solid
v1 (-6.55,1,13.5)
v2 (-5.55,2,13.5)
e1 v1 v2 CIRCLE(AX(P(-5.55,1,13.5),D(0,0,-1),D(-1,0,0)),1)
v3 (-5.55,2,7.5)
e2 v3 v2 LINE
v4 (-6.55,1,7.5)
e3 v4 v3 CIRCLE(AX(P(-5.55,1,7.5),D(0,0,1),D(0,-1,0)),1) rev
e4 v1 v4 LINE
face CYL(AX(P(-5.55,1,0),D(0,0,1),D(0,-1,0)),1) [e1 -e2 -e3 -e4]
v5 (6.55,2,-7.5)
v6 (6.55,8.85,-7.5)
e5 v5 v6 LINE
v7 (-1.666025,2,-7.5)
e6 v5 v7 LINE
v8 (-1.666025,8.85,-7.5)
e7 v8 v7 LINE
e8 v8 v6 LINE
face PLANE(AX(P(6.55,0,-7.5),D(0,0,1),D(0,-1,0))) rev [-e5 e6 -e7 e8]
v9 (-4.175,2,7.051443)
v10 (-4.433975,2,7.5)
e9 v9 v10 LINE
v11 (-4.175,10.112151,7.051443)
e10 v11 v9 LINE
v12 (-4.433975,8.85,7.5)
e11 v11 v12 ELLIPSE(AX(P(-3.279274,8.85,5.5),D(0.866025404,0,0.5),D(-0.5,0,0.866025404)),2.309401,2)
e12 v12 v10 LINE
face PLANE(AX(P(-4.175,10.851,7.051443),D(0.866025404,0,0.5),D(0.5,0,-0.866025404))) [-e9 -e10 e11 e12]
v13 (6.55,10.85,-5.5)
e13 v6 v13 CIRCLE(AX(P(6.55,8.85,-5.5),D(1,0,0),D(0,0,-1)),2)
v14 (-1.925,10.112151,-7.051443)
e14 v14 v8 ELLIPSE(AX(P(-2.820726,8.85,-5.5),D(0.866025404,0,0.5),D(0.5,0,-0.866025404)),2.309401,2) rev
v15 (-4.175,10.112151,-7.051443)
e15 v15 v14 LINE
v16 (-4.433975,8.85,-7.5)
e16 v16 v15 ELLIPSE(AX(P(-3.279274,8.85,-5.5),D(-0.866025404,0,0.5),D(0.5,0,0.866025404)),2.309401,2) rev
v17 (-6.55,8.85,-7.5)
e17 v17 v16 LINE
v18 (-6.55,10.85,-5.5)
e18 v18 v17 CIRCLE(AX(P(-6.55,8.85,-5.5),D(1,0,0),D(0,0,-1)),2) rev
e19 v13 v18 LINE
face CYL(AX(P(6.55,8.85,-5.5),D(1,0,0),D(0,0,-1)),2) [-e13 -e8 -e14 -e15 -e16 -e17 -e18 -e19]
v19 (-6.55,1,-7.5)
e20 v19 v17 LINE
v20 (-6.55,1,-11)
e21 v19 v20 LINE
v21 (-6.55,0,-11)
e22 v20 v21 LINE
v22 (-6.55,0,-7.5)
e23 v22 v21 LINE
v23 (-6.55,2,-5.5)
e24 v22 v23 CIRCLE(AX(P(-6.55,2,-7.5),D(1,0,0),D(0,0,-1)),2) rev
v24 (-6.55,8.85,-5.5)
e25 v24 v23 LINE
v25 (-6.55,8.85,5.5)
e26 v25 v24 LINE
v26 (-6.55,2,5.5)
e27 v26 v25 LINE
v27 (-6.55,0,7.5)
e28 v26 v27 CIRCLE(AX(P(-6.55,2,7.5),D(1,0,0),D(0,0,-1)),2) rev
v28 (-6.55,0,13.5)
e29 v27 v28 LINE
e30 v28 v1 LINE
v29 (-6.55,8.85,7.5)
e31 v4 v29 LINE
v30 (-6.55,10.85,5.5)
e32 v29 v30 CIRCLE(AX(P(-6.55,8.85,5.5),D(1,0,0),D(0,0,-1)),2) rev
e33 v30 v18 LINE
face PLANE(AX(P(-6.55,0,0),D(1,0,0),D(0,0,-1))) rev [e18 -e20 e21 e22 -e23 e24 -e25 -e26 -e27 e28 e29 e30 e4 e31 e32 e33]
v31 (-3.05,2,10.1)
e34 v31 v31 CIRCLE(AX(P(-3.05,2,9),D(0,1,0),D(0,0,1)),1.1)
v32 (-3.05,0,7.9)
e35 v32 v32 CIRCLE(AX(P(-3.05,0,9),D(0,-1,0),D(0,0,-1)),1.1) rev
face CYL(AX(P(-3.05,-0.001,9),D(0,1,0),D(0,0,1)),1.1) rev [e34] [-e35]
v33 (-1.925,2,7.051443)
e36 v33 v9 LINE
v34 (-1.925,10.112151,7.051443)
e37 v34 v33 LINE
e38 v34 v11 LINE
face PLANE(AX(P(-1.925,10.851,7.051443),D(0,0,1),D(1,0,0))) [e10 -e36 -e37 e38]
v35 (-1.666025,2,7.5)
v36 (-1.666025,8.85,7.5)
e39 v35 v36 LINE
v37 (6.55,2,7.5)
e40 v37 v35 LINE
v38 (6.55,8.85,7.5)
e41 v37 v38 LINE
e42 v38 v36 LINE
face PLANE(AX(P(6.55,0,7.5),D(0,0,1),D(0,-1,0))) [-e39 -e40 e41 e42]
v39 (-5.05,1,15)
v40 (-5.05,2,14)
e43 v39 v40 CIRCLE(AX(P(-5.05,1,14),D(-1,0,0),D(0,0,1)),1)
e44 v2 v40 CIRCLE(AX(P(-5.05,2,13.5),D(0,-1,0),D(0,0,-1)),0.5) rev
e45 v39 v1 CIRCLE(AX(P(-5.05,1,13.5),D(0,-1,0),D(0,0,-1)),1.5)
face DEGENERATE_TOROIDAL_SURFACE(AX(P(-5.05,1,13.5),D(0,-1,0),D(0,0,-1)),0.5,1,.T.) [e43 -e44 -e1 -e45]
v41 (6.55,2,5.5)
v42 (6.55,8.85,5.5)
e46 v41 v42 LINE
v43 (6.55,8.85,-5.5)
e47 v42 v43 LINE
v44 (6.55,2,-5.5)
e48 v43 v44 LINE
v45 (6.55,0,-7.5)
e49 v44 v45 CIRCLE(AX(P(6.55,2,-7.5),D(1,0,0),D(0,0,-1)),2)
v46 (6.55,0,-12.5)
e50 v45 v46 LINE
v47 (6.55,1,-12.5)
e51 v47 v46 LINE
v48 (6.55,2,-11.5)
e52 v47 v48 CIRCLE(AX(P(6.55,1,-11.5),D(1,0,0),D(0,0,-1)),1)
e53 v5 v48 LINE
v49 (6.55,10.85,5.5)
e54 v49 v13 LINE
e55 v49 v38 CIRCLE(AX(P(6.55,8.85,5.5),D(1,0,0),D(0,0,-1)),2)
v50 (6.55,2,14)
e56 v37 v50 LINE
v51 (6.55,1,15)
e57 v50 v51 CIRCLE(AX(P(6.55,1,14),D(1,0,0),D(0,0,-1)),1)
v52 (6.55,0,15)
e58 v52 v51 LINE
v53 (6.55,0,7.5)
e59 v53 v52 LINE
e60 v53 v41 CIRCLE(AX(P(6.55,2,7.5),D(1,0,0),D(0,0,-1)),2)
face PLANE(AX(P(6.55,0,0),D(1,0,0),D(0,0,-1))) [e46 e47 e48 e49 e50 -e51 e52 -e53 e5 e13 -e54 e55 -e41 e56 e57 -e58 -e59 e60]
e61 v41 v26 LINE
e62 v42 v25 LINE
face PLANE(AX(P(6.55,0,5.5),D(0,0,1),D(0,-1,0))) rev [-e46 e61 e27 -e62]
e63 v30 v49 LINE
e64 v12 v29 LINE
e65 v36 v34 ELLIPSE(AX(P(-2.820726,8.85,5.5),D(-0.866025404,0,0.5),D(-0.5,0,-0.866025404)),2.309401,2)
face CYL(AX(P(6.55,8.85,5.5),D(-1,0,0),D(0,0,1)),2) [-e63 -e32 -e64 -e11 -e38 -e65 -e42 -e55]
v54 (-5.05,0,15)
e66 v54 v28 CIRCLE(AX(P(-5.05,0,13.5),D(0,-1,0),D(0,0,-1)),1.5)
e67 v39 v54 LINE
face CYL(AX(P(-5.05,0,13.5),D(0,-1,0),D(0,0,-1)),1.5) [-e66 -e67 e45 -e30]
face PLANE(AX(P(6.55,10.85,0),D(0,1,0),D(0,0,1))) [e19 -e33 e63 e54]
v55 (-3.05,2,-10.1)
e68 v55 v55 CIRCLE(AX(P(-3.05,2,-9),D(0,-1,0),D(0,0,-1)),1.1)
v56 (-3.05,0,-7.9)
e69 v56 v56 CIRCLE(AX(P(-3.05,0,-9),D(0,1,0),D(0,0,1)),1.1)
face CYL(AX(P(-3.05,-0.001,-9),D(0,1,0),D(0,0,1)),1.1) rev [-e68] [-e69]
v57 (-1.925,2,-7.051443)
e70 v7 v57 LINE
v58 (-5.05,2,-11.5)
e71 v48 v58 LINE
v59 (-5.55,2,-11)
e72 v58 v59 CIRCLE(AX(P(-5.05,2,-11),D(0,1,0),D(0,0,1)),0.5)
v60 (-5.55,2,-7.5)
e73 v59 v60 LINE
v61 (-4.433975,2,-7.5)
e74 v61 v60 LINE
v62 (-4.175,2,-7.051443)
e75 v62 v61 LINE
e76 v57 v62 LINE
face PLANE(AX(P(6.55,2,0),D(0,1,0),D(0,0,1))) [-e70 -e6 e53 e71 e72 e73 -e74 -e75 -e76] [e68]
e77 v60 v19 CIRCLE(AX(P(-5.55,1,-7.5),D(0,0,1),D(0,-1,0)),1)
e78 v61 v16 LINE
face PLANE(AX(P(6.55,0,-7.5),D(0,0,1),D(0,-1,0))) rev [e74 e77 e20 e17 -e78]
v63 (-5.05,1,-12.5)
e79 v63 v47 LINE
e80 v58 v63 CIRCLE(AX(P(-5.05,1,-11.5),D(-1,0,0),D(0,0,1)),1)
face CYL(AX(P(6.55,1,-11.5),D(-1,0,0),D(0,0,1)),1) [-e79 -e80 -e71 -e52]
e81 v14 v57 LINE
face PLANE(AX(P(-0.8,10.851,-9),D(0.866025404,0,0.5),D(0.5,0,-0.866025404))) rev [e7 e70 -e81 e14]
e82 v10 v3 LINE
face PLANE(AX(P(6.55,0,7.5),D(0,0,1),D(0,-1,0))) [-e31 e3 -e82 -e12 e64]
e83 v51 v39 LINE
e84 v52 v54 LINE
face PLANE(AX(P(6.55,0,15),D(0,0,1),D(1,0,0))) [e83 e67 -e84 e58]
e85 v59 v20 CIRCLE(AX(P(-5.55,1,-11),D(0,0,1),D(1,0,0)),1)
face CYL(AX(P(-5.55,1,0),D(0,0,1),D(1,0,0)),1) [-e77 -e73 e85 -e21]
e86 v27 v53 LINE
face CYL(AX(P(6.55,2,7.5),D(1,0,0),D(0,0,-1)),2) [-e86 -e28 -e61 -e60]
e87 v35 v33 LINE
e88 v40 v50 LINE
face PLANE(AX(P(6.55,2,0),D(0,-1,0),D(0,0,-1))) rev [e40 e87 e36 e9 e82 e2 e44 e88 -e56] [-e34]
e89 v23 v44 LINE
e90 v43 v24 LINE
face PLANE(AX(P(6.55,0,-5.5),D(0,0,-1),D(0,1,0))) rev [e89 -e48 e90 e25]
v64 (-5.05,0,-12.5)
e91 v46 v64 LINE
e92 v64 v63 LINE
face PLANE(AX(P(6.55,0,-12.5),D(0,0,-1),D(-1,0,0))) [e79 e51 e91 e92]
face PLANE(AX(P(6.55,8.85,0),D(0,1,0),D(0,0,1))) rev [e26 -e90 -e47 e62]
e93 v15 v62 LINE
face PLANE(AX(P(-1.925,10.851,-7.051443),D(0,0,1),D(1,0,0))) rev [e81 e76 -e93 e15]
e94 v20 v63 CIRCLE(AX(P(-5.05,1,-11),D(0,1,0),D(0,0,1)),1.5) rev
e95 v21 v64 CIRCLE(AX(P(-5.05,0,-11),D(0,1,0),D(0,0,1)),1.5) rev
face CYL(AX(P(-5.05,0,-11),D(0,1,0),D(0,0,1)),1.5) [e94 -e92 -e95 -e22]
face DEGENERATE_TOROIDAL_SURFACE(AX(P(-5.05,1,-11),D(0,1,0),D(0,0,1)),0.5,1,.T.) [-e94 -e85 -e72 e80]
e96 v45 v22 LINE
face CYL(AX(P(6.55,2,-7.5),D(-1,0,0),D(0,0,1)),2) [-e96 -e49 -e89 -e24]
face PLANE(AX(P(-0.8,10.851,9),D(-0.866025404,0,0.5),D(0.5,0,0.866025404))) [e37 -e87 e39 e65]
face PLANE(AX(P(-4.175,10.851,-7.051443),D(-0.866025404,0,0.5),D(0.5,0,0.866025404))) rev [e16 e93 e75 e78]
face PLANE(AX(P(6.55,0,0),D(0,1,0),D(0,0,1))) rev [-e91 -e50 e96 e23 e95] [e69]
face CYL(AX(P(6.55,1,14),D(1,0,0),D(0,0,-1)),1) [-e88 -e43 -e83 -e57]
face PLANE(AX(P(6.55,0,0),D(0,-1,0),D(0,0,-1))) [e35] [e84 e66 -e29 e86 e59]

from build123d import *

# Parameters (mm, degrees)
BOSS_EXTRUDE1_DEPTH = 6.55
CUT_EXTRUDE1_REACH  = 20.607
SKETCH2_R           = 1.1
CUT_EXTRUDE2_REACH  = 20.607
FILLET1_R           = 2
FILLET3_R           = 1.5
FILLET4_R           = 1


with BuildPart() as part:
    # Sketch1 → Boss-Extrude1 (new, symmetric)
    with BuildSketch(Plane(origin=(0, 0, 0), x_dir=(0, 0, -1), z_dir=(1, 0, 0))):
        Polygon((-5.5, 8.85), (5.5, 8.85), (5.5, 0), (12.5, 0), (12.5, 2), (7.5, 2), (7.5, 10.85), (-7.5, 10.85), (-7.5, 2), (-15, 2), (-15, 0), (-5.5, 0), align=None)
    extrude(amount=BOSS_EXTRUDE1_DEPTH, both=True)

    # Sketch2 → Cut-Extrude1 (cut, up to next)
    with BuildSketch(Plane(origin=(0, 2, 0), x_dir=(1, 0, 0), z_dir=(0, 1, 0)), mode=Mode.PRIVATE) as cut_extrude1_sk1:
        with Locations(Location((-3.05, -9, 0), (0, 0, 270))):
            Circle(SKETCH2_R)
    cut_extrude1_tool1 = extrude(cut_extrude1_sk1.sketch, amount=-CUT_EXTRUDE1_REACH, mode=Mode.PRIVATE) & part.part
    cut_extrude1 = cut_extrude1_tool1.solids().sort_by_distance((-3.05, 2, 9))[0]
    add(cut_extrude1, mode=Mode.SUBTRACT)

    # Sketch3 → Cut-Extrude2 (cut, up to next)
    with BuildSketch(Plane(origin=(0, 2, 0), x_dir=(1, 0, 0), z_dir=(0, 1, 0)), mode=Mode.PRIVATE) as cut_extrude2_sk1:
        Polygon((-5.3, -9), (-4.175, -10.948557159), (-1.925, -10.948557159), (-0.8, -9), (-1.925, -7.051442841), (-4.175, -7.051442841), align=None)
    cut_extrude2_tool1 = extrude(cut_extrude2_sk1.sketch, amount=CUT_EXTRUDE2_REACH, mode=Mode.PRIVATE) & part.part
    cut_extrude2 = cut_extrude2_tool1.solids().sort_by_distance((-3.05, 2, 9))[0]
    add(cut_extrude2, mode=Mode.SUBTRACT)

    # Mirror1: Cut-Extrude1, Cut-Extrude2 across plane
    add(cut_extrude1.mirror(Plane.XY), mode=Mode.SUBTRACT)
    add(cut_extrude2.mirror(Plane.XY), mode=Mode.SUBTRACT)

    # Fillet1
    # the kernel refuses this fillet: 2 mm, written as the material it takes off along each edge
    with BuildSketch(Plane(origin=(-11.55, 0, -5.5), x_dir=(0, 1, 0), z_dir=(1, 0, 0)), Plane(origin=(11.55, 0, 5.5), x_dir=(0, 1, 0), z_dir=(-1, 0, 0))) as fillet1_piece_1:
        with BuildLine():
            CenterArc((FILLET1_R, -FILLET1_R), FILLET1_R, 90, 90)
            Line((0, -FILLET1_R), (0, 0))
            Line((0, 0), (FILLET1_R, 0))
        make_face()
    extrude(amount=23.1, mode=Mode.SUBTRACT)
    with BuildSketch(Plane(origin=(-6.666025404, 10.85, 7.5), x_dir=(0, 0, -1), z_dir=(1, 0, 0))) as fillet1_piece_2:
        with BuildLine():
            CenterArc((FILLET1_R, -FILLET1_R), FILLET1_R, 90, 90)
            Line((0, -FILLET1_R), (0, 0))
            Line((0, 0), (FILLET1_R, 0))
        make_face()
    extrude(amount=18.216025404, mode=Mode.SUBTRACT)
    with BuildSketch(Plane(origin=(-6.666025404, 10.85, -7.5), x_dir=(0, 0, 1), z_dir=(1, 0, 0))) as fillet1_piece_3:
        with BuildLine():
            CenterArc((FILLET1_R, FILLET1_R), FILLET1_R, 180, 90)
            Line((0, FILLET1_R), (0, 0))
            Line((0, 0), (FILLET1_R, 0))
        make_face()
    extrude(amount=18.216025404, mode=Mode.SUBTRACT)

    # Fillet3
    fillet3_edges = [part.edges().sort_by_distance(p)[0] for p in [
        (-6.55, 1, -12.5),
        (-6.55, 1, 15),
    ]]
    fillet(fillet3_edges, radius=FILLET3_R)

    # Fillet4
    fillet4_edges = [part.edges().sort_by_distance(p)[0] for p in [
        (-6.110660172, 2, 14.560660172),
        (-6.110660172, 2, -12.060660172),
        (-6.55, 2, 10.5),
        (-6.55, 2, -9.25),
        (0.75, 2, -12.5),
        (0.75, 2, 15),
    ]]
    fillet(fillet4_edges, radius=FILLET4_R)


solid = part.part
